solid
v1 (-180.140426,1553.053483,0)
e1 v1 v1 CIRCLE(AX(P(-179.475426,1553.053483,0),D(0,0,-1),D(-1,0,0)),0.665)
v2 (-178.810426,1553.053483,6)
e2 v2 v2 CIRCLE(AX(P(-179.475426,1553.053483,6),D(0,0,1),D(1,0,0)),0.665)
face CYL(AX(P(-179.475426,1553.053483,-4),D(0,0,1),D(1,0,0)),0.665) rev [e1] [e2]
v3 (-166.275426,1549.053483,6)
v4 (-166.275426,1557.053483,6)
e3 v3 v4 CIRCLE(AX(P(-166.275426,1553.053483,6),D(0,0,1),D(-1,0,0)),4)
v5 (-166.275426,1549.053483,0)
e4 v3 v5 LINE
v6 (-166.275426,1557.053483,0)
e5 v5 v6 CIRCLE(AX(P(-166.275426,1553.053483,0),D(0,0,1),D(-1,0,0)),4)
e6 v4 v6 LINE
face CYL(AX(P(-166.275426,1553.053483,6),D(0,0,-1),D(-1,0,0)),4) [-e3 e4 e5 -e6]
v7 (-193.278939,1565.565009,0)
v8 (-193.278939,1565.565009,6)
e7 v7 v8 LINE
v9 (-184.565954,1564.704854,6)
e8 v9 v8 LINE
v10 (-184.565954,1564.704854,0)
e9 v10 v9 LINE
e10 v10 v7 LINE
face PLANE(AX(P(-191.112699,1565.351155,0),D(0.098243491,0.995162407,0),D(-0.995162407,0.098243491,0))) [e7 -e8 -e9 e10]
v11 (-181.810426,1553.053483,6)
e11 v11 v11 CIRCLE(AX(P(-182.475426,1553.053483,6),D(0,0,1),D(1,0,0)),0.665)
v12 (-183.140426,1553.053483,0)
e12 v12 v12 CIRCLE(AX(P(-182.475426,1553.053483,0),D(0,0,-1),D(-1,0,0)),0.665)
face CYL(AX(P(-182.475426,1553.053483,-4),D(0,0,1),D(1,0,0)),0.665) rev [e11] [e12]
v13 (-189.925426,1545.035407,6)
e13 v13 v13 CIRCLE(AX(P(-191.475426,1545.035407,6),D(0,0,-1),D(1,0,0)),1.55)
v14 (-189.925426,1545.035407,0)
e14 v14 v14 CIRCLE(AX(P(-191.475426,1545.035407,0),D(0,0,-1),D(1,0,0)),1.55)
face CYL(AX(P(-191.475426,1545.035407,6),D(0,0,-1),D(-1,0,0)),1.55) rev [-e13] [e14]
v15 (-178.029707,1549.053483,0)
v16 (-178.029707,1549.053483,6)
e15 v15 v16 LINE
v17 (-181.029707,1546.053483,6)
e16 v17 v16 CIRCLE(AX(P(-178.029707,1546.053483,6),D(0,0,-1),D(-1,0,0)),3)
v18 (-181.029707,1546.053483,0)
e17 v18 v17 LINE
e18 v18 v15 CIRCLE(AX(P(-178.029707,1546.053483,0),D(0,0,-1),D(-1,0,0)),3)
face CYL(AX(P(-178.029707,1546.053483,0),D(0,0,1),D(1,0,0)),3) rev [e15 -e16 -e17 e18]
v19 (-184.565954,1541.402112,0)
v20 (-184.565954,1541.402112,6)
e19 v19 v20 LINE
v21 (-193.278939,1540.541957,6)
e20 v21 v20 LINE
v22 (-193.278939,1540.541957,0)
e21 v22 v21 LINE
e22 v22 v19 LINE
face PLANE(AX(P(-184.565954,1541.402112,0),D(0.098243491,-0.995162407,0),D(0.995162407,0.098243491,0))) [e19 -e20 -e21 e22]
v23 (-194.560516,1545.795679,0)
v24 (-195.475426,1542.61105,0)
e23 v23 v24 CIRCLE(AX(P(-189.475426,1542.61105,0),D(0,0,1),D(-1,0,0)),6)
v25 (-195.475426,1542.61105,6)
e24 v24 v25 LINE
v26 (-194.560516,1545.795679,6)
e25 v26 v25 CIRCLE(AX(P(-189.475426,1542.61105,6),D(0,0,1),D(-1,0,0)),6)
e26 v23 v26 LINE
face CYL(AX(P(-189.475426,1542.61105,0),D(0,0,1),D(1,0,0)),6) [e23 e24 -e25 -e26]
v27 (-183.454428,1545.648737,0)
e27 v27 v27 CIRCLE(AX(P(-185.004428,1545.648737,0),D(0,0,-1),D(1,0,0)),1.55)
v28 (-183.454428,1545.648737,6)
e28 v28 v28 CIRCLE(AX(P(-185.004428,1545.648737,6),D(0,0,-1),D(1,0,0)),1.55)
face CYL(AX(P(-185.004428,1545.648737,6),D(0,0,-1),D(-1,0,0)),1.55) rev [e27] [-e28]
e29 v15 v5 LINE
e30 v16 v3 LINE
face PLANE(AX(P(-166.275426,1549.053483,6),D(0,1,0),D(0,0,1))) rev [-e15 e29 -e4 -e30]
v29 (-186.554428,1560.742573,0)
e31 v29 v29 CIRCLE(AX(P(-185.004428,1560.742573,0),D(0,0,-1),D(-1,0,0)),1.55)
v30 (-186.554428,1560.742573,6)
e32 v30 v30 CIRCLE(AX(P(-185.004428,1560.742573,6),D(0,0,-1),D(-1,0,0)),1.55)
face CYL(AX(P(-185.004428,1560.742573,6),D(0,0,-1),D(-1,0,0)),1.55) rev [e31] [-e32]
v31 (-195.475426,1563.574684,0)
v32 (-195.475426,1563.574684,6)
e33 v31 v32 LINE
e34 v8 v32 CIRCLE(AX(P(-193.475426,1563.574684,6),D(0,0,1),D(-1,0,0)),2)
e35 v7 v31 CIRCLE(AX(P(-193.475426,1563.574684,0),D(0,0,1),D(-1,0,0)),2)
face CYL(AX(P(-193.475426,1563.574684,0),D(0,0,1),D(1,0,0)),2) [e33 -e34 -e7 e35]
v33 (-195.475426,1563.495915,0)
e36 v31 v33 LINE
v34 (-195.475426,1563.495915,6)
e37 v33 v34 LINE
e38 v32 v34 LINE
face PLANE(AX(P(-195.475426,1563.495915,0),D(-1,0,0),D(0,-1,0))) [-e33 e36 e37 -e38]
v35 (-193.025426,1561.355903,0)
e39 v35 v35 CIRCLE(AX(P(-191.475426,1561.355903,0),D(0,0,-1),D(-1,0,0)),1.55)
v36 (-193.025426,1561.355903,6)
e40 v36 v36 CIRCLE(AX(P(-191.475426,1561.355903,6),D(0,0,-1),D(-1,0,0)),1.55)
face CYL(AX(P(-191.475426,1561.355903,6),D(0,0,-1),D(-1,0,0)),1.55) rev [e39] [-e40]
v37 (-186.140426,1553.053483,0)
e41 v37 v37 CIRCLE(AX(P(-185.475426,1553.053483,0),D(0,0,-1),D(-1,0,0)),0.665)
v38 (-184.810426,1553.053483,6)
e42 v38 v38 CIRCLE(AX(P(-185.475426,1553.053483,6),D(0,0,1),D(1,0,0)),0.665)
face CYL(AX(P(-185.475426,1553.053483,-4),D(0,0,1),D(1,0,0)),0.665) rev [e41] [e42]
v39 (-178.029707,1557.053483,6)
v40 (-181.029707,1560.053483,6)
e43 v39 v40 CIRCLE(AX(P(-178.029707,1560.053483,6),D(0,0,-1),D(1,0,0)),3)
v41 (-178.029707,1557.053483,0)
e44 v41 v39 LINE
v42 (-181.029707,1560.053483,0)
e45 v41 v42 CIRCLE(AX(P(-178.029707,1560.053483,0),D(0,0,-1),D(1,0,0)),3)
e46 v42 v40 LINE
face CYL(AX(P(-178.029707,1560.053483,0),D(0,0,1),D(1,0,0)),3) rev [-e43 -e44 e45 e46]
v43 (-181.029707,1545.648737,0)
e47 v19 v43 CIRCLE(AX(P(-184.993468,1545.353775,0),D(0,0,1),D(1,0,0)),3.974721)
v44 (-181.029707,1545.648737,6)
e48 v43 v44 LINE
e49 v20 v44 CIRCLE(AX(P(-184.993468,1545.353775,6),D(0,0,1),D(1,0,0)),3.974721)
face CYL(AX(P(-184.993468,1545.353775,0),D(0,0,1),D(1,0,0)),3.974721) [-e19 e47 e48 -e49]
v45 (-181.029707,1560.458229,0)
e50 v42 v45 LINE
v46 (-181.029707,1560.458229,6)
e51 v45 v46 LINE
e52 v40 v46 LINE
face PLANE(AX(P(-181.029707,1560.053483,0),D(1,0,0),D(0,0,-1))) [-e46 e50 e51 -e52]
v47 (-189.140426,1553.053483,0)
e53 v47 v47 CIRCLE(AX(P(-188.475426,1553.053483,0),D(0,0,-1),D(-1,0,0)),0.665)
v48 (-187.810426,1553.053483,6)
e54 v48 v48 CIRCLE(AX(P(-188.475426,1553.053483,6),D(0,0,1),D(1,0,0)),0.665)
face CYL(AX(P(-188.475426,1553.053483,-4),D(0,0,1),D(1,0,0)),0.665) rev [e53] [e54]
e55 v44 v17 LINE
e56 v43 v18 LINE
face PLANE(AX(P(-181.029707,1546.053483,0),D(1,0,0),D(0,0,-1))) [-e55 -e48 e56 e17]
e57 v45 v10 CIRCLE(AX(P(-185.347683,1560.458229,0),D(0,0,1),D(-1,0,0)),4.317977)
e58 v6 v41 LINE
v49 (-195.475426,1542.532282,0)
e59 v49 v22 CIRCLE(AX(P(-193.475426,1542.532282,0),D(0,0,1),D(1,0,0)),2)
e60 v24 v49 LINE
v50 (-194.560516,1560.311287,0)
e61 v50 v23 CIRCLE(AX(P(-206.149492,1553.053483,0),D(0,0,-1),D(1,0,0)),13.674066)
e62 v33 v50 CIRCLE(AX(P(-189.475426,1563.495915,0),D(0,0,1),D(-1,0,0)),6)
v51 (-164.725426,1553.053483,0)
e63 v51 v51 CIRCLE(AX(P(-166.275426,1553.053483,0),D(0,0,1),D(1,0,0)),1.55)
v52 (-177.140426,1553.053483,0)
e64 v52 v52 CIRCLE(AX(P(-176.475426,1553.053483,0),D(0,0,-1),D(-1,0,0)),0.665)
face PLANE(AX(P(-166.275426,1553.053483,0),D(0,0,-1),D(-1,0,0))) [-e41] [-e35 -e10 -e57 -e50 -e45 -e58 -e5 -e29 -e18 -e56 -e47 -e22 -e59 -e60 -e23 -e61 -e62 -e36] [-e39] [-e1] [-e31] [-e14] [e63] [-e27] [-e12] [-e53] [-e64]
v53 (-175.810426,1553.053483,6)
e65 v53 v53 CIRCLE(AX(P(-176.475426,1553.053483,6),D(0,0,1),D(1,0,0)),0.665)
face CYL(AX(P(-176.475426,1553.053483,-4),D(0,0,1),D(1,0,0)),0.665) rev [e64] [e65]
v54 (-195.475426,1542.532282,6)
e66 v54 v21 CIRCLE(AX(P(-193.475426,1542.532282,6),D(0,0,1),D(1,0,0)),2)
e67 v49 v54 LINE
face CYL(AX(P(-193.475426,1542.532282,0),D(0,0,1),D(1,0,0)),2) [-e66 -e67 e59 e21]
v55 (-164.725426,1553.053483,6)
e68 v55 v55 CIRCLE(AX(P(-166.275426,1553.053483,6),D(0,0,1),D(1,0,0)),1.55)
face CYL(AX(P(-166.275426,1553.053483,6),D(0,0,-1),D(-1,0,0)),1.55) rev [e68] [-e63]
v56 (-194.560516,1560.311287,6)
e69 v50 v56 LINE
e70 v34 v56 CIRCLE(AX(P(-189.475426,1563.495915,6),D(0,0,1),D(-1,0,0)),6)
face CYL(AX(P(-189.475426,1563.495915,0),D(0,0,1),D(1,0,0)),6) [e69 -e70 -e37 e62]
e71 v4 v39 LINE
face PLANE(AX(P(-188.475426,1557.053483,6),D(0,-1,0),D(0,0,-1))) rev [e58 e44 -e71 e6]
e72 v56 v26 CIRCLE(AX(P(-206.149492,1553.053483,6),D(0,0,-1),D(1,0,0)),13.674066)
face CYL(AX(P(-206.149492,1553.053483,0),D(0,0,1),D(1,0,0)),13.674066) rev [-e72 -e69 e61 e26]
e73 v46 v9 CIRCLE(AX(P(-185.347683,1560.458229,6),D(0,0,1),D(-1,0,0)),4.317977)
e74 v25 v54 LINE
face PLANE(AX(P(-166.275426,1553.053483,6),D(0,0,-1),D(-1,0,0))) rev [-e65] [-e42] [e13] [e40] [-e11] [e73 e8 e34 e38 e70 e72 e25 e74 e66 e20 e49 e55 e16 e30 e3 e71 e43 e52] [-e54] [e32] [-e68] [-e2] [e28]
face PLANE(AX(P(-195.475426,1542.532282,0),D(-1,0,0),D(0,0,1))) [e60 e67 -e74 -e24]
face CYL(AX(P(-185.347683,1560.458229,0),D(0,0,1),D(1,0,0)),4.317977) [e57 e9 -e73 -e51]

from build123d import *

# Parameters (mm, degrees)
SZKIC1_R                    = 1.55
DODANIE_WYCI_GNI_CIE1_DEPTH = 6
DODANIE_WYCI_GNI_CIE2_DEPTH = 6
WYTNIJ_WYCI_GNI_CIE3_START  = -10
SZKIC2_R                    = 0.665
SZKIC2_R_2                  = 1.55
WYTNIJ_WYCI_GNI_CIE3_DEPTH  = 10
SZYK_LINIOWY1_OUTLINE_R     = 0.665
SZYK_LINIOWY1_DEPTH         = 6
SZKIC6_R                    = 1.55
WYTNIJ_WYCI_GNI_CIE6_DEPTH  = 6


# Read off the part's stored shape, not the designer's step: Szyk liniowy1
with BuildPart() as part:
    # Szkic1 → Dodanie-wyciągnięcie1 (new body)
    with BuildSketch(Plane.XY):
        with BuildLine():
            Line((-166.275426397, 1549.053482816), (-188.475426397, 1549.053482816))
            ThreePointArc((-188.475426397, 1549.053482816), (-192.475426397, 1553.053482816), (-188.475426397, 1557.053482816))
            Line((-188.475426397, 1557.053482816), (-166.275426397, 1557.053482816))
            ThreePointArc((-166.275426397, 1557.053482816), (-162.275426397, 1553.053482816), (-166.275426397, 1549.053482816))
        make_face()
        with Locations((-166.275426397, 1553.053482816)):
            Circle(SZKIC1_R, mode=Mode.SUBTRACT)
    extrude(amount=DODANIE_WYCI_GNI_CIE1_DEPTH)

    # Szkic5 → Dodanie-wyciągnięcie2 (add)
    with BuildSketch(Plane.XY.offset(6)):
        with BuildLine():
            Line((-195.475426397, 1563.495915282), (-195.475426397, 1563.574683951))
            ThreePointArc((-195.475426397, 1563.574683951), (-194.81837577, 1565.056738938), (-193.278939414, 1565.565008766))
            Line((-193.278939414, 1565.565008766), (-191.112699272, 1565.351155235))
            Line((-191.112699272, 1565.351155235), (-184.565954248, 1564.704853604))
            ThreePointArc((-184.565954248, 1564.704853604), (-182.02952048, 1563.221328031), (-181.029706775, 1560.458228876))
            Line((-181.029706775, 1560.458228876), (-181.029706775, 1560.053482816))
            ThreePointArc((-181.029706775, 1560.053482816), (-180.151027119, 1557.932162472), (-178.029706775, 1557.053482816))
            Line((-178.029706775, 1557.053482816), (-178.029706775, 1549.053482816))
            ThreePointArc((-178.029706775, 1549.053482816), (-180.151027119, 1548.174803159), (-181.029706775, 1546.053482816))
            Line((-181.029706775, 1546.053482816), (-181.029706775, 1545.648736756))
            ThreePointArc((-181.029706775, 1545.648736756), (-181.939081075, 1542.810326939), (-184.565954248, 1541.402112028))
            Line((-184.565954248, 1541.402112028), (-188.141654627, 1541.049115084))
            Line((-188.141654627, 1541.049115084), (-193.278939414, 1540.541956866))
            ThreePointArc((-193.278939414, 1540.541956866), (-194.81837577, 1541.050226694), (-195.475426397, 1542.53228168))
            Line((-195.475426397, 1542.53228168), (-195.475426397, 1542.61105035))
            ThreePointArc((-195.475426397, 1542.61105035), (-195.242164639, 1544.267773032), (-194.560516381, 1545.795679033))
            ThreePointArc((-194.560516381, 1545.795679033), (-192.475426397, 1553.053482816), (-194.560516381, 1560.311286599))
            ThreePointArc((-194.560516381, 1560.311286599), (-195.242164639, 1561.839192599), (-195.475426397, 1563.495915282))
        make_face()
    extrude(amount=-DODANIE_WYCI_GNI_CIE2_DEPTH)

    # Szkic2 → Wytnij-wyciągnięcie3 (cut)
    with BuildSketch(Plane.XY.offset(6).offset(WYTNIJ_WYCI_GNI_CIE3_START)):
        with Locations((-188.475426397, 1553.053482816)):
            Circle(SZKIC2_R)
        with Locations((-166.275426397, 1553.053482816)):
            Circle(SZKIC2_R_2)
    extrude(amount=WYTNIJ_WYCI_GNI_CIE3_DEPTH, mode=Mode.SUBTRACT)

    # Szyk liniowy1 outline → Szyk liniowy1 (cut)
    with BuildSketch(Plane.XY):
        with Locations((-185.475426397, 1553.053482816)):
            Circle(SZYK_LINIOWY1_OUTLINE_R)
        with Locations((-182.475426397, 1553.053482816)):
            Circle(SZYK_LINIOWY1_OUTLINE_R)
        with Locations((-179.475426397, 1553.053482816)):
            Circle(SZYK_LINIOWY1_OUTLINE_R)
        with Locations((-176.475426397, 1553.053482816)):
            Circle(SZYK_LINIOWY1_OUTLINE_R)
    extrude(amount=SZYK_LINIOWY1_DEPTH, mode=Mode.SUBTRACT)

    # Szkic6 → Wytnij-wyciągnięcie6 (cut)
    with BuildSketch(Plane(origin=(0, 0, 0), x_dir=(-1, 0, 0), z_dir=(0, 0, -1))):
        with Locations((185.004427547, 1560.742573003)):
            Circle(SZKIC6_R)
        with Locations((191.475426395, 1561.355903175)):
            Circle(SZKIC6_R)
        with Locations(Location((191.475426395, 1545.035406583, 0), (0, 0, 180))):
            Circle(SZKIC6_R)
        with Locations(Location((185.004427547, 1545.648736756, 0), (0, 0, 180))):
            Circle(SZKIC6_R)
    extrude(amount=-WYTNIJ_WYCI_GNI_CIE6_DEPTH, mode=Mode.SUBTRACT)


solid = part.part
